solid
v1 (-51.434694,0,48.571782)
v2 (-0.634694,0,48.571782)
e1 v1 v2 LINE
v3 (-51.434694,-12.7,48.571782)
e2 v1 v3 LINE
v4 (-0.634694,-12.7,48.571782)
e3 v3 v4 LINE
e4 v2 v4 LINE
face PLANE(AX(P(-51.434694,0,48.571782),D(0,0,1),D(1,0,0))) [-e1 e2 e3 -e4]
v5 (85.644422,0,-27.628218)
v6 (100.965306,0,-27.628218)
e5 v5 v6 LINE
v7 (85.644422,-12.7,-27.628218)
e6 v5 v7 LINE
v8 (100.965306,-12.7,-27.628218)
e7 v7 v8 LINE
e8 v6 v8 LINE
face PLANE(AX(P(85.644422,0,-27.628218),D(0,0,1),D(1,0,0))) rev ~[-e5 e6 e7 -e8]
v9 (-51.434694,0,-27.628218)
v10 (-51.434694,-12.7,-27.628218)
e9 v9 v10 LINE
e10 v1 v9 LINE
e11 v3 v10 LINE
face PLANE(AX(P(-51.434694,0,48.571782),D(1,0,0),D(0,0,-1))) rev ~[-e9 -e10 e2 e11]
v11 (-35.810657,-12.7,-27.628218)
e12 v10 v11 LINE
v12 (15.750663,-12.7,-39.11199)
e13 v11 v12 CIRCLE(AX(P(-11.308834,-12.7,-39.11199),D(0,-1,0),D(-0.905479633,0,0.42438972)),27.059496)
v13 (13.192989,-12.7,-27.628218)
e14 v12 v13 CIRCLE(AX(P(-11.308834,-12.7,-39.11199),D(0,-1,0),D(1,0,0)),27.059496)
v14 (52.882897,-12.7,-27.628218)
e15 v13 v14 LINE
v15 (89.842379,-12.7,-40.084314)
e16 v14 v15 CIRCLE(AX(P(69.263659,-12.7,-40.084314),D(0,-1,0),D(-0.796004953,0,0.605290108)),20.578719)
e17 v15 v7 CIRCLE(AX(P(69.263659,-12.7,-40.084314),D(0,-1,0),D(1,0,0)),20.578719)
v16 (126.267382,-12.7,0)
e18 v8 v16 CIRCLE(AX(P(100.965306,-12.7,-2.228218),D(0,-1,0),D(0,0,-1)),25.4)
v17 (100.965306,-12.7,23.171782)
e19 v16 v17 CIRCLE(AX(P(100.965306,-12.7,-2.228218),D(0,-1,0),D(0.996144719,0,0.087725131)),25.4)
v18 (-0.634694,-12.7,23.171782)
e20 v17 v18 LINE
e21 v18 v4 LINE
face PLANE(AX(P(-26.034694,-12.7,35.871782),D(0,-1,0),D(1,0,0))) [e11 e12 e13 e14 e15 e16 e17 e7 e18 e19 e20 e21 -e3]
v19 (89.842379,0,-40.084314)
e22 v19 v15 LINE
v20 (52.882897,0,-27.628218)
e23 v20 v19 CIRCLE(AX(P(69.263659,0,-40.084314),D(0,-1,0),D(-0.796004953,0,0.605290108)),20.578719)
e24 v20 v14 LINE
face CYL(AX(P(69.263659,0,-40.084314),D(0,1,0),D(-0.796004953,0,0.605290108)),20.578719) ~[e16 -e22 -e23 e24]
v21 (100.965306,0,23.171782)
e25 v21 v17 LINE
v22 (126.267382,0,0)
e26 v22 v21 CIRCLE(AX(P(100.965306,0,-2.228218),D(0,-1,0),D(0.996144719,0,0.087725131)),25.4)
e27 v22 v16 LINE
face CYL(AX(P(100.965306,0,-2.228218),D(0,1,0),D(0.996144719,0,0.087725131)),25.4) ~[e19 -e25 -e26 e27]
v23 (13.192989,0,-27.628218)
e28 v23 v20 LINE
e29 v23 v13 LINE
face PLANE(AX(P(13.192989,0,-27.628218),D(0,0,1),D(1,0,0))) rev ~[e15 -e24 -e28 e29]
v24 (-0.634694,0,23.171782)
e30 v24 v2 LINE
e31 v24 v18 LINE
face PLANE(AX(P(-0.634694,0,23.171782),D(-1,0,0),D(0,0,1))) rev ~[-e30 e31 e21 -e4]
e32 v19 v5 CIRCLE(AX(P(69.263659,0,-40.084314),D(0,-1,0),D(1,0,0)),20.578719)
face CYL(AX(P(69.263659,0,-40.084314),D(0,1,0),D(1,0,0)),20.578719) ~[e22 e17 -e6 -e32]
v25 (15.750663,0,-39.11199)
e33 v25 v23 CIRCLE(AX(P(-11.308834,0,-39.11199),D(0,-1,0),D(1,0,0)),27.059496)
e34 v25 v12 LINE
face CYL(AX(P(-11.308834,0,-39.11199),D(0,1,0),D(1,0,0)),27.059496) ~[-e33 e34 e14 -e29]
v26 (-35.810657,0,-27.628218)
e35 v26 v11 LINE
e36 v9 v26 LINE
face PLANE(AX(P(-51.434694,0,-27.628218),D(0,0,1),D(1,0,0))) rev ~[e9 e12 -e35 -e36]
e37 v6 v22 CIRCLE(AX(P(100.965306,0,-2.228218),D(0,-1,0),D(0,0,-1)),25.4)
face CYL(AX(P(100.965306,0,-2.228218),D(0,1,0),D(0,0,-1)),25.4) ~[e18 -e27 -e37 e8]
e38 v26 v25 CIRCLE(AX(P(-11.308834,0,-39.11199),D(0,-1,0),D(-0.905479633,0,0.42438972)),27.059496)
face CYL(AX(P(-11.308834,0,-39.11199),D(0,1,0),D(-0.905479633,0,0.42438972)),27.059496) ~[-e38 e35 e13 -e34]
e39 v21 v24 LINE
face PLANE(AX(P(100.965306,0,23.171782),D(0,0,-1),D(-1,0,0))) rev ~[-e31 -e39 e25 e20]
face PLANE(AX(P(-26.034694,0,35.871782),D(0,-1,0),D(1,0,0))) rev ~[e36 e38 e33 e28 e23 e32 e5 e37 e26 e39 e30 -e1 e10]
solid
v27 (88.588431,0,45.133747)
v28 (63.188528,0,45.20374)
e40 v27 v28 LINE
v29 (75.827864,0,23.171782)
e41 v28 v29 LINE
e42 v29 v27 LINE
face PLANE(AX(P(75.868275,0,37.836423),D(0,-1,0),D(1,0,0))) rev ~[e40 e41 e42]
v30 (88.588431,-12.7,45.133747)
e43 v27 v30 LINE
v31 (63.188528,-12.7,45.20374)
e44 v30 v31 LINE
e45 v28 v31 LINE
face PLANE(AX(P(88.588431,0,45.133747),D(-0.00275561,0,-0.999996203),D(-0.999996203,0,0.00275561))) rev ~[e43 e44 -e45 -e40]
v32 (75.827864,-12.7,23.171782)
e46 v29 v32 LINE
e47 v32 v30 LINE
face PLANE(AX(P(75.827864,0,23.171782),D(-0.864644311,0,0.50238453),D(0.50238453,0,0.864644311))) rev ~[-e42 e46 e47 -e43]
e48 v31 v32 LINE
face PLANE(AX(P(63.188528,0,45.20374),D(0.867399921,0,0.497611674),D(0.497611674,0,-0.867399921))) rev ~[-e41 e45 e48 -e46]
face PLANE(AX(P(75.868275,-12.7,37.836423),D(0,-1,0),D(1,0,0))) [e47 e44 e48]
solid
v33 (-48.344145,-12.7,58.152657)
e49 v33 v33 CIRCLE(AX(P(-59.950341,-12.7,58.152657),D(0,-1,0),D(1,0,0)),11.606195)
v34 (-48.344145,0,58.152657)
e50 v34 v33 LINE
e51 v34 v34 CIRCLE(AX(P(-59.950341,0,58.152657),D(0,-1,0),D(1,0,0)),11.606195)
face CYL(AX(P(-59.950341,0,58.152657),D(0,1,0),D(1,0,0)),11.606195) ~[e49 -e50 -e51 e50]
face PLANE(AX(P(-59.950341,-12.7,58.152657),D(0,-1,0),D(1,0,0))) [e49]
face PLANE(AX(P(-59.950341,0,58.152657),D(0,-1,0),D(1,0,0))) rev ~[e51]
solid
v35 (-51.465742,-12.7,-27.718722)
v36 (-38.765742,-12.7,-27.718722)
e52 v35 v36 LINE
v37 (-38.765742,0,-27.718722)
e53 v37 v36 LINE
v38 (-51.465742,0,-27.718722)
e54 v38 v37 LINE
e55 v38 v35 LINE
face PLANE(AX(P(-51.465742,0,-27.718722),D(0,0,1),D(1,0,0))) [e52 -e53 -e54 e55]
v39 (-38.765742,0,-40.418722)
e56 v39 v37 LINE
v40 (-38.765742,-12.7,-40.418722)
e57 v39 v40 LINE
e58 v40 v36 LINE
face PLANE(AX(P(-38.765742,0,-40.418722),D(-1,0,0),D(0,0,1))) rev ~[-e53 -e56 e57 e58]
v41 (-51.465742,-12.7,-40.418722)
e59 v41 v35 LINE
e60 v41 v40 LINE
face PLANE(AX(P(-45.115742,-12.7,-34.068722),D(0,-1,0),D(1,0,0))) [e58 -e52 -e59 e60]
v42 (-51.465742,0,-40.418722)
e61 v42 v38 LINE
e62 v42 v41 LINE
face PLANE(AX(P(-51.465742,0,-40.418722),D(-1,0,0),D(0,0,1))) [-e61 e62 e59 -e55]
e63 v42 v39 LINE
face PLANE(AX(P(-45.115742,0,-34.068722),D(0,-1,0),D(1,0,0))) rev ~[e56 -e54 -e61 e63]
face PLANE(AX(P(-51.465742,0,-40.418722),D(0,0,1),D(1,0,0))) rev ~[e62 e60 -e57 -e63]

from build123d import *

# Parameters (mm, degrees)
F1_W     = 50.8
F1_H     = 25.4
F2_DEPTH = 12.7
F1_W_2   = 12.7
F1_H_2   = 12.7
F0_R     = 11.6061953028


with BuildPart() as f2:
    # F1 (on Front) → F2 (new body)
    with BuildSketch(Plane.XZ):
        with Locations((-26.0346938372, 35.8717816622)):
            Rectangle(F1_W, F1_H)
        with BuildLine():
            Line((-0.6346938372, 23.1717816622), (-51.4346938372, 23.1717816622))
            Line((-51.4346938372, 23.1717816622), (-51.4346938372, -27.6282183378))
            Line((-51.4346938372, -27.6282183378), (-35.8106568949, -27.6282183378))
            ThreePointArc((-35.8106568949, -27.6282183378), (-11.3088339567, -12.0524939981), (13.1929889814, -27.6282183378))
            Line((13.1929889814, -27.6282183378), (52.8828968769, -27.6282183378))
            ThreePointArc((52.8828968769, -27.6282183378), (69.2636594176, -19.5055942382), (85.6444219583, -27.6282183378))
            Line((85.6444219583, -27.6282183378), (100.9653061628, -27.6282183378))
            Line((100.9653061628, -27.6282183378), (100.9653061628, 23.1717816622))
            Line((100.9653061628, 23.1717816622), (75.827864427, 23.1717816622))
            Line((75.827864427, 23.1717816622), (-0.6346938372, 23.1717816622))
        make_face()
        with BuildLine():
            ThreePointArc((13.1929889814, -27.6282183378), (-11.3088339567, -12.0524939981), (-35.8106568949, -27.6282183378))
            Line((-35.8106568949, -27.6282183378), (-11.3088339567, -27.6282183378))
            Line((-11.3088339567, -27.6282183378), (13.1929889814, -27.6282183378))
        make_face()
        with BuildLine():
            Line((-11.3088339567, -27.6282183378), (-35.8106568949, -27.6282183378))
            ThreePointArc((-35.8106568949, -27.6282183378), (-17.1914081512, -65.5243298477), (15.7506625268, -39.1119904816))
            ThreePointArc((15.7506625268, -39.1119904816), (15.1035054093, -33.2294162871), (13.1929889814, -27.6282183378))
            Line((13.1929889814, -27.6282183378), (-11.3088339567, -27.6282183378))
        make_face()
        with BuildLine():
            ThreePointArc((126.2673820271, 0), (118.1199448098, 16.5035293887), (100.9653061628, 23.1717816622))
            Line((100.9653061628, 23.1717816622), (100.9653061628, -27.6282183378))
            ThreePointArc((100.9653061628, -27.6282183378), (119.6970538894, -19.3828569848), (126.2673820271, 0))
        make_face()
        with BuildLine():
            ThreePointArc((85.6444219583, -27.6282183378), (69.2636594176, -19.5055942382), (52.8828968769, -27.6282183378))
            Line((52.8828968769, -27.6282183378), (85.6444219583, -27.6282183378))
        make_face()
        with BuildLine():
            Line((85.6444219583, -27.6282183378), (52.8828968769, -27.6282183378))
            ThreePointArc((52.8828968769, -27.6282183378), (62.6914232933, -59.5853239072), (89.8423787807, -40.0843136013))
            ThreePointArc((89.8423787807, -40.0843136013), (88.7646697236, -33.512077477), (85.6444219583, -27.6282183378))
        make_face()
    extrude(amount=F2_DEPTH)


with BuildPart() as f2b:
    # F1 (on Front) → F2, piece 2 (new body)
    with BuildSketch(Plane.XZ):
        Polygon((63.1885279137, 45.2037396438), (75.827864427, 23.1717816622), (88.5884314775, 45.1337471604), align=None)
    extrude(amount=F2_DEPTH)


with BuildPart() as f2c:
    # F1 (on Front) → F2, piece 3 (new body)
    with BuildSketch(Plane.XZ):
        with Locations((-45.11574229, -34.0687217355)):
            Rectangle(F1_W_2, F1_H_2)
    extrude(amount=F2_DEPTH)


with BuildPart() as f2d:
    # F0 (on Front) → F2, piece 4 (new body)
    with BuildSketch(Plane.XZ):
        with Locations((-59.9503405392, 58.1526570022)):
            Circle(F0_R)
    extrude(amount=F2_DEPTH)


solid = Compound([f2.part, f2b.part, f2c.part, f2d.part])
